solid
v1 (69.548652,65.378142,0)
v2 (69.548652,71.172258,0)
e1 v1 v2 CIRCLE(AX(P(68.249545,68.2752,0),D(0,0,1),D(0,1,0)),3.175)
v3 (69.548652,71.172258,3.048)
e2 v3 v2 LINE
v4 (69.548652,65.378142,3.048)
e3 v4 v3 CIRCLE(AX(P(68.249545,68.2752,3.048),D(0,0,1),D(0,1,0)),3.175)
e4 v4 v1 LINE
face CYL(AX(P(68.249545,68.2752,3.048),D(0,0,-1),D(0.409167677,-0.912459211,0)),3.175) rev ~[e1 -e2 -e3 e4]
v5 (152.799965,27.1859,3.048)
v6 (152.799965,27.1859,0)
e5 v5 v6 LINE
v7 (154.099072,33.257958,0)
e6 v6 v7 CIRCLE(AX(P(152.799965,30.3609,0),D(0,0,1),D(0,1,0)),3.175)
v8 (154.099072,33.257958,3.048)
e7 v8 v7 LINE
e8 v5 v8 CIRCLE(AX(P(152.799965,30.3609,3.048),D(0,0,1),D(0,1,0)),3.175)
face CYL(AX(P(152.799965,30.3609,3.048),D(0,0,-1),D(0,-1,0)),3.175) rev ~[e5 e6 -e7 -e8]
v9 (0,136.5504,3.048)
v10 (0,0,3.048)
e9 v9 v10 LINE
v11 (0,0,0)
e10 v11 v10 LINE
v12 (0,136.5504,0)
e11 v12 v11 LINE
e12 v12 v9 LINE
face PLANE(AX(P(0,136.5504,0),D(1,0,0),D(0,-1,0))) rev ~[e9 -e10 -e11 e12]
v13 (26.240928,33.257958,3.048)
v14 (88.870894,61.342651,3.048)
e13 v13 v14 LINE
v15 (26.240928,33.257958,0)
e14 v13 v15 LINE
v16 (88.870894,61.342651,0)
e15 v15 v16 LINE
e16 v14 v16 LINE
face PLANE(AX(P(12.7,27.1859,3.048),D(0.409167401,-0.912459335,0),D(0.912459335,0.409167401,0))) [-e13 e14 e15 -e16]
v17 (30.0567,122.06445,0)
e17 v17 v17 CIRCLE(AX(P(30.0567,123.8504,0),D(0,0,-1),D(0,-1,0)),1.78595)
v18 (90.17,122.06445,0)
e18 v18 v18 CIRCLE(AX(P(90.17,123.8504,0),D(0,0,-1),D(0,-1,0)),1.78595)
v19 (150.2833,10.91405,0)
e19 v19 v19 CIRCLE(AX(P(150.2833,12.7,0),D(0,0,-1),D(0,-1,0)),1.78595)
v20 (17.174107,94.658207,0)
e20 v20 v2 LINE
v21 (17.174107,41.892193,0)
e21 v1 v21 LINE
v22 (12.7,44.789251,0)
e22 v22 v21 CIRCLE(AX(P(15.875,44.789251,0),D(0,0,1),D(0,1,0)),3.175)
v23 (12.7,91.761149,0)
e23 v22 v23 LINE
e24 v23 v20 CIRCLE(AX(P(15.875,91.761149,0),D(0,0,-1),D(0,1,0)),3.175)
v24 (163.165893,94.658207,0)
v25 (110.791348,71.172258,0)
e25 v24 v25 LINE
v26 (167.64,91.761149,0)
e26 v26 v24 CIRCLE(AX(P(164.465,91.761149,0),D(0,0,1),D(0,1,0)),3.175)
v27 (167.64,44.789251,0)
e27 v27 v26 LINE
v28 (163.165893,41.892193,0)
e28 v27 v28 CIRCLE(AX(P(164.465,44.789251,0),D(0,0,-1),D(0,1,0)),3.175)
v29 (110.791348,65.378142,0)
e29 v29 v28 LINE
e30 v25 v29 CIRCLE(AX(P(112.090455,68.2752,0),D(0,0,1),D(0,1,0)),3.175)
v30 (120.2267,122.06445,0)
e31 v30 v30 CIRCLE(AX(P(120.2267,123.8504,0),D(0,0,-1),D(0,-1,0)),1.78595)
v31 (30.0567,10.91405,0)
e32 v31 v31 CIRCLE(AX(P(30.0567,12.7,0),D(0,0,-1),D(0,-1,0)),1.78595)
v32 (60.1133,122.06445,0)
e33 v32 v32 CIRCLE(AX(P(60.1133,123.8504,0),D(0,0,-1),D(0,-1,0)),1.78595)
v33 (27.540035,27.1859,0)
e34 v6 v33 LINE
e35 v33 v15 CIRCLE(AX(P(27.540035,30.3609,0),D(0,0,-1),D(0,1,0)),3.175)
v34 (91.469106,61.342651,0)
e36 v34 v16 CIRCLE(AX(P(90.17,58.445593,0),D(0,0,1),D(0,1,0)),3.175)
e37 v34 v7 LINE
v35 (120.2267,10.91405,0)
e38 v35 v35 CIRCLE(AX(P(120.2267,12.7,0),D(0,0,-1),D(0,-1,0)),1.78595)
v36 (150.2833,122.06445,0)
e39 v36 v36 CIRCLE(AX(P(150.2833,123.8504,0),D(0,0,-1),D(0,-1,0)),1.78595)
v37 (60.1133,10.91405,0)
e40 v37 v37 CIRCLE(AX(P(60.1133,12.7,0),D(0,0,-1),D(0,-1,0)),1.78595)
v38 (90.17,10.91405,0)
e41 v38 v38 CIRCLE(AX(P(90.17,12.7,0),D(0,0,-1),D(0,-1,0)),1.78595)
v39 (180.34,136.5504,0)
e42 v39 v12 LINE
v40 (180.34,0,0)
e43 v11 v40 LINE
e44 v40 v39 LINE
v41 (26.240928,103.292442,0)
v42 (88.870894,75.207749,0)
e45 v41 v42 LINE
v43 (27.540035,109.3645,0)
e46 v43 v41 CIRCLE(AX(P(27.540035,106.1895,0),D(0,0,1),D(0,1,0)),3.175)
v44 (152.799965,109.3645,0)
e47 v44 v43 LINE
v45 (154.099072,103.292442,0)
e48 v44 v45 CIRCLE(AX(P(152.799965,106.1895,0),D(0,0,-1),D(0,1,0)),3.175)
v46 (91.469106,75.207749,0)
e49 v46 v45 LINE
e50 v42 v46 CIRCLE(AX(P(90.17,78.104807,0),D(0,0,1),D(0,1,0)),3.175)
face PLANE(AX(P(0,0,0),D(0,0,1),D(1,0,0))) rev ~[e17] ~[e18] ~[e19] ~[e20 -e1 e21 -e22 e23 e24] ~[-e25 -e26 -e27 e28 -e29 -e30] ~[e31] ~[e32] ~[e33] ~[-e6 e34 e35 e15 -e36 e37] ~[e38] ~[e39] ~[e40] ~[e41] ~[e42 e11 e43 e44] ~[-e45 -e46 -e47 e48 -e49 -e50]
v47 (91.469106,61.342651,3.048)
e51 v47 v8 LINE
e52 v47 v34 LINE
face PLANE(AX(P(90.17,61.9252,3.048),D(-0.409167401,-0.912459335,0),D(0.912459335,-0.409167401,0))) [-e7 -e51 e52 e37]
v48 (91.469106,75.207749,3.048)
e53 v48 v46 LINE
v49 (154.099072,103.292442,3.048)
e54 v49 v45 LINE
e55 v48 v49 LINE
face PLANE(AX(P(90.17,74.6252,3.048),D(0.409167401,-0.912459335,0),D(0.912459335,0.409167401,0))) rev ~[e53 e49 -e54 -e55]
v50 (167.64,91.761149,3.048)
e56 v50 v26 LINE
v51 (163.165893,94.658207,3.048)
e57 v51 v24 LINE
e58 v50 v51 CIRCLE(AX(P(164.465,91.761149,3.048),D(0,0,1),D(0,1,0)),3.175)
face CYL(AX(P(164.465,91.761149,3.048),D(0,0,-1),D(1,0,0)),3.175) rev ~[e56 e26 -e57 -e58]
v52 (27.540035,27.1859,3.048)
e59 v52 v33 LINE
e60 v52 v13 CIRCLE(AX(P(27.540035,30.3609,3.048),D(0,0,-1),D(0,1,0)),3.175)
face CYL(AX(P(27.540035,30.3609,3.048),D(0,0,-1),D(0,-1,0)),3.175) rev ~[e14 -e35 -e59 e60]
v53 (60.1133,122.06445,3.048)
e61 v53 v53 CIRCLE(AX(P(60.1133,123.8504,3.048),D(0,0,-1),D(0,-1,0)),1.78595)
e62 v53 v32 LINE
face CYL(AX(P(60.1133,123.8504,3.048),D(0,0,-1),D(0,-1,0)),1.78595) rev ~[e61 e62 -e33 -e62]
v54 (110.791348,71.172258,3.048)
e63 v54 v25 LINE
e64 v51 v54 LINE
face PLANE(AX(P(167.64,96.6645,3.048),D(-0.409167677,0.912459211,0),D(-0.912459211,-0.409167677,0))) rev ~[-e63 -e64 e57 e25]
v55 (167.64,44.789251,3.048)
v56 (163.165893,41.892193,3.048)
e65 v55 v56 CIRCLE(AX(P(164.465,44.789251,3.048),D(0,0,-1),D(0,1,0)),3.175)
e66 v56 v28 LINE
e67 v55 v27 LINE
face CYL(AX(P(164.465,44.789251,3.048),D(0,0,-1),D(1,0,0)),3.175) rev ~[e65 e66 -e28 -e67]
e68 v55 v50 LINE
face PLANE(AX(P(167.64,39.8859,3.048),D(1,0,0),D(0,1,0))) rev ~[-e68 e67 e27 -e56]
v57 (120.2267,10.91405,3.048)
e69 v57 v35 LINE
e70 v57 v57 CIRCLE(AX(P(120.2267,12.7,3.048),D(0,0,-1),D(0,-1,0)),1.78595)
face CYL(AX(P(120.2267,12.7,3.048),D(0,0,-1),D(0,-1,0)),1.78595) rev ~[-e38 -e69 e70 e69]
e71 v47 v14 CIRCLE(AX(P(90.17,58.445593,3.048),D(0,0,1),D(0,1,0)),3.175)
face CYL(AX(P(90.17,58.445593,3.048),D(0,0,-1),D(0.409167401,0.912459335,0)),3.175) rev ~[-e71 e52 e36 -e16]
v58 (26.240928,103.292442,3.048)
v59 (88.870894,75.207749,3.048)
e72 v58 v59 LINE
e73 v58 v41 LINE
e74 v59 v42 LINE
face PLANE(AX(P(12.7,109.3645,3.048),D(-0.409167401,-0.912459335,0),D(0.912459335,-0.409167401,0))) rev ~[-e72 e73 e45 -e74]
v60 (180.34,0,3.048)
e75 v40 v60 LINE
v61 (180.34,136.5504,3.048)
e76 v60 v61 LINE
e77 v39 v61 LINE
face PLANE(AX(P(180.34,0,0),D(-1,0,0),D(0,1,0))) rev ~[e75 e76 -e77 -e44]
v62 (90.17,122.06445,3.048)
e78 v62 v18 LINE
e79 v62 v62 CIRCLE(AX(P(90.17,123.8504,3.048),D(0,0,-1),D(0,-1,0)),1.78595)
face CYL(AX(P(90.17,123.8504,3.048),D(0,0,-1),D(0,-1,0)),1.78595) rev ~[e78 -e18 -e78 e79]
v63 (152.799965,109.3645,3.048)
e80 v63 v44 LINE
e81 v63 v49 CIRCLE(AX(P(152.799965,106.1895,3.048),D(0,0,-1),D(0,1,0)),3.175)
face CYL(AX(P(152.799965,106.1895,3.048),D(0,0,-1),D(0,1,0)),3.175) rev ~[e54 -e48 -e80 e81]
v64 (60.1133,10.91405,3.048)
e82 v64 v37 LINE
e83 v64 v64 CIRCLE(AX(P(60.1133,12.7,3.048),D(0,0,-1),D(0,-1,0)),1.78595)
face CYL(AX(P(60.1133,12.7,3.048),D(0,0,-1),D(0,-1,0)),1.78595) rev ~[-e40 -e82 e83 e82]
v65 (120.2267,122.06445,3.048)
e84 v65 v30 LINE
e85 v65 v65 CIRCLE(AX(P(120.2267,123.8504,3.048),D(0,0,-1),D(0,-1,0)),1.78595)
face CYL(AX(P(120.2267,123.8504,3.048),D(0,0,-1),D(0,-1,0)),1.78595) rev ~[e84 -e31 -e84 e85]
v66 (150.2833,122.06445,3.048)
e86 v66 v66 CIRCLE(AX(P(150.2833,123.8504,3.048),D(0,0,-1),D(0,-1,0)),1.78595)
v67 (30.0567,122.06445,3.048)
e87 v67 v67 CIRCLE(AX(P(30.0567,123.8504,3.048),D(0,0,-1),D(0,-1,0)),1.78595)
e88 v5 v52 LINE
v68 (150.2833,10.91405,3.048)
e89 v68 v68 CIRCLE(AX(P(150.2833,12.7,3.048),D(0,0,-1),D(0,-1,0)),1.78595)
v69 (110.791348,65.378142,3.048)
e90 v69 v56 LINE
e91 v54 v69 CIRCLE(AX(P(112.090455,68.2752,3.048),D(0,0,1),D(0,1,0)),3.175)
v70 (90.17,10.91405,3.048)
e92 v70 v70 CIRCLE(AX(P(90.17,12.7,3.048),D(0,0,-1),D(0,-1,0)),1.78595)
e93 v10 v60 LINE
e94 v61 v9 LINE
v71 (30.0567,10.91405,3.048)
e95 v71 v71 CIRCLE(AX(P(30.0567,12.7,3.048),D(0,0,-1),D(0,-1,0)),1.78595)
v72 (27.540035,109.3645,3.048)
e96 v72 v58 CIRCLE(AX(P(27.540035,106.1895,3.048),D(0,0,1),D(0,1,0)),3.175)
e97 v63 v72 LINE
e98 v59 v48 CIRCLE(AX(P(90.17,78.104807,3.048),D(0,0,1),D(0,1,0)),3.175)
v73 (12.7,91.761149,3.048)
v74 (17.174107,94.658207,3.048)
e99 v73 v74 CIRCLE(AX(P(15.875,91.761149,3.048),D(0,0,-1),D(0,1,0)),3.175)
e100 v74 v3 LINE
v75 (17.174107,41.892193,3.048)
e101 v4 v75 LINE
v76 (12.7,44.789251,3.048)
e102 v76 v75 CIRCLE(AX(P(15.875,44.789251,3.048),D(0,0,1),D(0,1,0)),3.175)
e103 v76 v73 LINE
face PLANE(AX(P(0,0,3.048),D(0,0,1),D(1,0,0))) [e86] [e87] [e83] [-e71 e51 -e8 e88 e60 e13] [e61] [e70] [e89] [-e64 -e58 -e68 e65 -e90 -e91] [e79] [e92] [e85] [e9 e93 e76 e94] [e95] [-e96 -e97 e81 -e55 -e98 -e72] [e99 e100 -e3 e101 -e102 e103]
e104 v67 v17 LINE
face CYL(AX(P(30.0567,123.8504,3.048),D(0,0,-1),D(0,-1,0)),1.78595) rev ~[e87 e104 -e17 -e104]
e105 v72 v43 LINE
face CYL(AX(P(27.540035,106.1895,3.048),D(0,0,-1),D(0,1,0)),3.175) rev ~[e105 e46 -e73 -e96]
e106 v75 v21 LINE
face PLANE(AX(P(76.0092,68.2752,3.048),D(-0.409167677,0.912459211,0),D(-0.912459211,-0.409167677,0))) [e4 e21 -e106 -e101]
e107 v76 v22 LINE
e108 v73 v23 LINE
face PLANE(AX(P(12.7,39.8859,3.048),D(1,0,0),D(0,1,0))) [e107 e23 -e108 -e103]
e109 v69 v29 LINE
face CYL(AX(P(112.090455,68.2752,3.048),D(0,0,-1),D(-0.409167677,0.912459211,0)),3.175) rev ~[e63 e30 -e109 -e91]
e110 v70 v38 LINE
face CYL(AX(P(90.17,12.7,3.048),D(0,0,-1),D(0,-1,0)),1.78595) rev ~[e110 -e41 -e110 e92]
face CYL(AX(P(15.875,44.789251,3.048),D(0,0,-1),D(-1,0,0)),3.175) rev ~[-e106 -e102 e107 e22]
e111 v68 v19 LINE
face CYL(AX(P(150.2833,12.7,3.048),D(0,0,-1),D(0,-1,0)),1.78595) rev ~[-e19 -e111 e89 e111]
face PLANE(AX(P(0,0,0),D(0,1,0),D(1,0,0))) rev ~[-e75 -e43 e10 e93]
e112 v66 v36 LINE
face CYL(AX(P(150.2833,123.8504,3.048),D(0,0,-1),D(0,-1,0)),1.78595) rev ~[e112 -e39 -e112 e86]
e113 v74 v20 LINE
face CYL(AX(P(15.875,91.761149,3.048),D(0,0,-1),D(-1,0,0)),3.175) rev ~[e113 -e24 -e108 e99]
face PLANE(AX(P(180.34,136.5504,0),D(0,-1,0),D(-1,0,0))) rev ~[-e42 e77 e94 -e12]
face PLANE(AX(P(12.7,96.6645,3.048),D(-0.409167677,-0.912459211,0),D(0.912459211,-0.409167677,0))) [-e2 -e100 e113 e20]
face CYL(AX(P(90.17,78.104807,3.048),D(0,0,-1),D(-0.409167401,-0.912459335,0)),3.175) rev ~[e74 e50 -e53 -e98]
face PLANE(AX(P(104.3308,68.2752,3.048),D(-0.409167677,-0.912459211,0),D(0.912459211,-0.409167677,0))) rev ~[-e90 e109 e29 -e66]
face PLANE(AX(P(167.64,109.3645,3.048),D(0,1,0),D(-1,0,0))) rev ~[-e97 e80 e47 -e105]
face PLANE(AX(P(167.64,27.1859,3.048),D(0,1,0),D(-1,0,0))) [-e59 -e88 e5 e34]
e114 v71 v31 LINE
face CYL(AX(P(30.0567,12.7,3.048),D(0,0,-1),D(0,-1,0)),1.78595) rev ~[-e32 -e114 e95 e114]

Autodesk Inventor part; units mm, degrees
ref_plane "YZ Plane" through (0, 0, 0) normal (1, 0, 0) x (0, 1, 0)
ref_plane "XZ Plane" through (0, 0, 0) normal (0, 1, 0) x (-1, 0, 0)
ref_plane "XY Plane" through (0, 0, 0) normal (0, 0, 1) x (1, 0, 0)
sketch "profile sketch" plane through (0, 0, 0) normal (0, 0, 1) x (1, 0, 0)
  line L0 (0, 0) -> (180.34, 0)
  line L1 (180.34, 0) -> (180.34, 136.5504)
  line L2 (180.34, 136.5504) -> (0, 136.5504)
  line L3 (0, 136.5504) -> (0, 0)
  dimension "d5" = 180.34
  dimension "d6" = 136.5504
extrude "Plate1" add sketch "profile sketch" along normal blind 3.048
sketch "rv_hole_sketch" plane through (0, 0, 3.048) normal (0, 0, 1) x (1, 0, 0)
  line L0 (0, 136.5504) -> (0, 0) construction
  line L1 (180.34, 0) -> (180.34, 136.5504) construction
  line L2 (0, 136.5504) -> (180.34, 136.5504) construction
  line L3 (180.34, 0) -> (0, 0) construction
  line L4 (0, 123.8504) -> (30.0567, 123.8504) construction
  line L5 (30.0567, 123.8504) -> (60.1133, 123.8504) construction
  line L6 (60.1133, 123.8504) -> (90.17, 123.8504) construction
  line L7 (90.17, 123.8504) -> (120.2267, 123.8504) construction
  line L8 (120.2267, 123.8504) -> (150.2833, 123.8504) construction
  line L9 (150.2833, 123.8504) -> (180.34, 123.8504) construction
  line L10 (0, 12.7) -> (30.0567, 12.7) construction
  line L11 (30.0567, 12.7) -> (60.1133, 12.7) construction
  line L12 (60.1133, 12.7) -> (90.17, 12.7) construction
  line L13 (90.17, 12.7) -> (120.2267, 12.7) construction
  line L14 (120.2267, 12.7) -> (150.2833, 12.7) construction
  line L15 (150.2833, 12.7) -> (180.34, 12.7) construction
  dimension "d10" = 12.7
  dimension "d11" = 12.7
hole "rv_holes" at (30.0567, 123.8504, 3.048) at (60.1133, 123.8504, 3.048) at (90.17, 123.8504, 3.048) at (120.2267, 123.8504, 3.048) at (150.2833, 123.8504, 3.048) at (150.2833, 12.7, 3.048) at (120.2267, 12.7, 3.048) at (90.17, 12.7, 3.048) at (60.1133, 12.7, 3.048) at (30.0567, 12.7, 3.048) direction (0, 0, -1) diameter 3.5719 depth 3.048 tip angle 118
sketch "cutout_sketch" plane through (0, 0, 3.048) normal (0, 0, 1) x (1, 0, 0)
  line L0 (12.7, 109.3645) -> (90.17, 74.6252)
  line L1 (90.17, 74.6252) -> (167.64, 109.3645)
  line L2 (167.64, 109.3645) -> (12.7, 109.3645)
  line L3 (12.7, 27.1859) -> (90.17, 61.9252)
  line L4 (90.17, 61.9252) -> (167.64, 27.1859)
  line L5 (167.64, 27.1859) -> (12.7, 27.1859)
  circle A0 centre (90.17, 123.8504) radius 1.7859 projected
  circle A1 centre (90.17, 12.7) radius 1.7859 projected
  line L6 (0, 0) -> (0, 136.5504) projected
  line L7 (180.34, 136.5504) -> (180.34, 0) projected
  line L8 (90.17, 74.6252) -> (90.17, 61.9252) construction
  line L9 (12.7, 96.6645) -> (76.0092, 68.2752)
  line L10 (76.0092, 68.2752) -> (12.7, 39.8859)
  line L11 (12.7, 39.8859) -> (12.7, 96.6645)
  line L12 (167.64, 96.6645) -> (104.3308, 68.2752)
  line L13 (104.3308, 68.2752) -> (167.64, 39.8859)
  line L14 (167.64, 39.8859) -> (167.64, 96.6645)
  line L15 (167.64, 109.3645) -> (167.64, 27.1859) construction
  line L16 (12.7, 109.3645) -> (12.7, 27.1859) construction
  dimension "d36" = 12.7
  dimension "d37" = 12.7
  dimension "d38" = 12.7
  dimension "d39" = 12.7
  dimension "d40" = 12.7
  dimension "d41" = 12.7
  dimension "d42" = 12.7
  dimension "d43" = 12.7
extrude "Cut2" cut sketch "cutout_sketch" against normal blind 3.048 contours L2 L1 L0 | L3 L4 L5 | L9 L10 L11 | L14 L13 L12
fillet "Corner Round3" radius 3.175 12 edges at (12.7, 109.3645, 1.524) (167.64, 109.3645, 1.524) (90.17, 74.6252, 1.524) (12.7, 39.8859, 1.524) (12.7, 96.6645, 1.524) (76.0092, 68.2752, 1.524) (90.17, 61.9252, 1.524) (12.7, 27.1859, 1.524) (167.64, 27.1859, 1.524) (104.3308, 68.2752, 1.524) (167.64, 96.6645, 1.524) (167.64, 39.8859, 1.524)
equation "\"d5\" = bh_length"
equation "\"d6\" = bp_height"
equation "\"d10\" = 0.5 * cb_outer_diameter"
equation "\"d11\" = 0.5 * cb_outer_diameter"
equation "\"d12\" = rv_hole_diameter"
equation "\"d17\" = Thickness"
equation "\"d36\" = cmp_mounting_margins"
equation "\"d37\" = cmp_mounting_margins"
equation "\"d38\" = cmp_mounting_margins"
equation "\"d39\" = cmp_mounting_margins"
equation "\"d40\" = cmp_mounting_margins"
equation "\"d41\" = cmp_mounting_margins"
equation "\"d42\" = cmp_mounting_margins"
equation "\"d43\" = cmp_mounting_margins"
equation "\"d44\" = Thickness"
equation "\"d46\" = spd_fillet_size"
equation "\"BendRadius\" = Thickness"
equation "\"BendReliefWidth\" = Thickness"
equation "\"BendReliefDepth\" = 0.5 * Thickness"
equation "\"CornerReliefSize\" = 4 * Thickness"
equation "\"MinimumRemnant\" = 2 * Thickness"
equation "\"TransitionRadius\" = BendRadius"
equation "\"JacobiRadiusSize\" = BendRadius"
equation "\"GapSize\" = Thickness"
equation "\"bh_width\" = 87.63"
equation "\"bh_length\" = 180.34"
equation "\"bh_height\" = bp_height - cb_outer_diameter"
equation "\"bh_metal_width\" = 1.5875"
equation "\"cpn_diameter\" = 69.85"
equation "\"cpn_length\" = 311.15"
equation "\"cmp_foot_seperation_long\" = 139.954"
equation "\"cmp_foot_seperation_short\" = 36.068"
equation "\"cmp_mounting_margins\" = 12.7"
equation "\"cmp_foot_bolt_diameter\" = 6.35"
equation "\"spd_fillet_size\" = 3.175"
equation "\"bp_height\" = gb_mh_seperation + st_outer_diameter"
equation "\"bp_tensioner_width\" = 6.35"
equation "\"bp_tensioner_height\" = 50.8"
equation "\"bp_tensioner_wood_mount_from_tensioner_top\" = 12.7"
equation "\"bp_tensioner_wood_mount_diameter\" = 6.35"
equation "\"cb_outer_diameter\" = 25.4"
equation "\"cb_wall_thickness\" = 1.5875"
equation "\"cb_length\" = 457.2"
equation "\"pdb_mounting_holes_short\" = 104.394"
equation "\"cb_pdb_low_mount_offset\" = 16.0782"
equation "\"pdb_mounting_holes_long\" = 182.2704"
equation "\"pdb_ziptie_hole_diameter\" = 6.35"
equation "\"gb_mh_seperation\" = 111.1504"
equation "\"gb_mh_diameter\" = 6.35"
equation "\"gb_axle_from_edge\" = 38.1"
equation "\"gb_width\" = 127"
equation "\"gb_bearing_diameter\" = 28.575"
equation "\"gb_to_bottom_of_side_assembly\" = 4.7752"
equation "\"ncbt_rivet_row_length\" = 114.3"
equation "\"rv_hole_diameter\" = 3.57187"
equation "\"st_outer_diameter\" = 25.4"
equation "\"st_wall_thickness\" = 1.5875"
equation "\"st_length\" = 685.8"
equation "\"st_gbmh_from_center\" = 55.5752"
equation "\"st_cutout_depth_right\" = 203.2"
equation "\"st_cutout_depth_left\" = 203.2"
equation "\"st_rivet_distance\" = 19.05"
equation "\"so_inner_diameter\" = 7.62"
equation "\"so_wall_thickness\" = 5.08"
equation "\"so_length\" = 40.64"
equation "\"twb_width\" = st_outer_diameter"
equation "\"twb_length\" = bp_tensioner_width + 2 * twb_margin_on_each_side"
equation "\"twb_height\" = 2 * bp_tensioner_wood_mount_diameter + bp_tensioner_height + 2 * bp_tensioner_wood_mount_from_tensioner_top + twb_margin_on_each_side"
equation "\"twb_margin_on_each_side\" = 6.35"
equation "\"twb_tensioner_from_edge\" = -0.5 * bp_tensioner_height + 0.5 * twb_height"
equation "\"tb_rivet_row_length\" = 127"
equation "\"bp_thickness\" = 3.048"
equation "\"bp_width\" = 76.2"
equation "\"bp_axle_height\" = 45.1612"
equation "\"magic_axle_offset\" = 2.286"
equation "\"bp_tensioner_from_bottom\" = 38.1"
equation "\"bp_tensioner_from_side\" = 25.4"
equation "\"d7\" = BendRadius"
equation "\"bh_alternate_height\" = 25.4"
equation "\"bh_alternate_width\" = 81.28"
equation "\"tb_metal_thickness\" = 3.048"
equation "\"tb_hm_mounting_slot_length\" = 40.64"
equation "\"gb_mh_seperation_alt\" = 111.125"
equation "\"gb_axle_from_edge_alt\" = 43.1546"
equation "\"bp_axle_height_alt\" = 50.2158"
equation "\"pdb_mount_include\" = 0"
equation "\"Thickness\" = 3.048"
properties part number "cross_structural_plate(csp)" material "Aluminum 6061"
